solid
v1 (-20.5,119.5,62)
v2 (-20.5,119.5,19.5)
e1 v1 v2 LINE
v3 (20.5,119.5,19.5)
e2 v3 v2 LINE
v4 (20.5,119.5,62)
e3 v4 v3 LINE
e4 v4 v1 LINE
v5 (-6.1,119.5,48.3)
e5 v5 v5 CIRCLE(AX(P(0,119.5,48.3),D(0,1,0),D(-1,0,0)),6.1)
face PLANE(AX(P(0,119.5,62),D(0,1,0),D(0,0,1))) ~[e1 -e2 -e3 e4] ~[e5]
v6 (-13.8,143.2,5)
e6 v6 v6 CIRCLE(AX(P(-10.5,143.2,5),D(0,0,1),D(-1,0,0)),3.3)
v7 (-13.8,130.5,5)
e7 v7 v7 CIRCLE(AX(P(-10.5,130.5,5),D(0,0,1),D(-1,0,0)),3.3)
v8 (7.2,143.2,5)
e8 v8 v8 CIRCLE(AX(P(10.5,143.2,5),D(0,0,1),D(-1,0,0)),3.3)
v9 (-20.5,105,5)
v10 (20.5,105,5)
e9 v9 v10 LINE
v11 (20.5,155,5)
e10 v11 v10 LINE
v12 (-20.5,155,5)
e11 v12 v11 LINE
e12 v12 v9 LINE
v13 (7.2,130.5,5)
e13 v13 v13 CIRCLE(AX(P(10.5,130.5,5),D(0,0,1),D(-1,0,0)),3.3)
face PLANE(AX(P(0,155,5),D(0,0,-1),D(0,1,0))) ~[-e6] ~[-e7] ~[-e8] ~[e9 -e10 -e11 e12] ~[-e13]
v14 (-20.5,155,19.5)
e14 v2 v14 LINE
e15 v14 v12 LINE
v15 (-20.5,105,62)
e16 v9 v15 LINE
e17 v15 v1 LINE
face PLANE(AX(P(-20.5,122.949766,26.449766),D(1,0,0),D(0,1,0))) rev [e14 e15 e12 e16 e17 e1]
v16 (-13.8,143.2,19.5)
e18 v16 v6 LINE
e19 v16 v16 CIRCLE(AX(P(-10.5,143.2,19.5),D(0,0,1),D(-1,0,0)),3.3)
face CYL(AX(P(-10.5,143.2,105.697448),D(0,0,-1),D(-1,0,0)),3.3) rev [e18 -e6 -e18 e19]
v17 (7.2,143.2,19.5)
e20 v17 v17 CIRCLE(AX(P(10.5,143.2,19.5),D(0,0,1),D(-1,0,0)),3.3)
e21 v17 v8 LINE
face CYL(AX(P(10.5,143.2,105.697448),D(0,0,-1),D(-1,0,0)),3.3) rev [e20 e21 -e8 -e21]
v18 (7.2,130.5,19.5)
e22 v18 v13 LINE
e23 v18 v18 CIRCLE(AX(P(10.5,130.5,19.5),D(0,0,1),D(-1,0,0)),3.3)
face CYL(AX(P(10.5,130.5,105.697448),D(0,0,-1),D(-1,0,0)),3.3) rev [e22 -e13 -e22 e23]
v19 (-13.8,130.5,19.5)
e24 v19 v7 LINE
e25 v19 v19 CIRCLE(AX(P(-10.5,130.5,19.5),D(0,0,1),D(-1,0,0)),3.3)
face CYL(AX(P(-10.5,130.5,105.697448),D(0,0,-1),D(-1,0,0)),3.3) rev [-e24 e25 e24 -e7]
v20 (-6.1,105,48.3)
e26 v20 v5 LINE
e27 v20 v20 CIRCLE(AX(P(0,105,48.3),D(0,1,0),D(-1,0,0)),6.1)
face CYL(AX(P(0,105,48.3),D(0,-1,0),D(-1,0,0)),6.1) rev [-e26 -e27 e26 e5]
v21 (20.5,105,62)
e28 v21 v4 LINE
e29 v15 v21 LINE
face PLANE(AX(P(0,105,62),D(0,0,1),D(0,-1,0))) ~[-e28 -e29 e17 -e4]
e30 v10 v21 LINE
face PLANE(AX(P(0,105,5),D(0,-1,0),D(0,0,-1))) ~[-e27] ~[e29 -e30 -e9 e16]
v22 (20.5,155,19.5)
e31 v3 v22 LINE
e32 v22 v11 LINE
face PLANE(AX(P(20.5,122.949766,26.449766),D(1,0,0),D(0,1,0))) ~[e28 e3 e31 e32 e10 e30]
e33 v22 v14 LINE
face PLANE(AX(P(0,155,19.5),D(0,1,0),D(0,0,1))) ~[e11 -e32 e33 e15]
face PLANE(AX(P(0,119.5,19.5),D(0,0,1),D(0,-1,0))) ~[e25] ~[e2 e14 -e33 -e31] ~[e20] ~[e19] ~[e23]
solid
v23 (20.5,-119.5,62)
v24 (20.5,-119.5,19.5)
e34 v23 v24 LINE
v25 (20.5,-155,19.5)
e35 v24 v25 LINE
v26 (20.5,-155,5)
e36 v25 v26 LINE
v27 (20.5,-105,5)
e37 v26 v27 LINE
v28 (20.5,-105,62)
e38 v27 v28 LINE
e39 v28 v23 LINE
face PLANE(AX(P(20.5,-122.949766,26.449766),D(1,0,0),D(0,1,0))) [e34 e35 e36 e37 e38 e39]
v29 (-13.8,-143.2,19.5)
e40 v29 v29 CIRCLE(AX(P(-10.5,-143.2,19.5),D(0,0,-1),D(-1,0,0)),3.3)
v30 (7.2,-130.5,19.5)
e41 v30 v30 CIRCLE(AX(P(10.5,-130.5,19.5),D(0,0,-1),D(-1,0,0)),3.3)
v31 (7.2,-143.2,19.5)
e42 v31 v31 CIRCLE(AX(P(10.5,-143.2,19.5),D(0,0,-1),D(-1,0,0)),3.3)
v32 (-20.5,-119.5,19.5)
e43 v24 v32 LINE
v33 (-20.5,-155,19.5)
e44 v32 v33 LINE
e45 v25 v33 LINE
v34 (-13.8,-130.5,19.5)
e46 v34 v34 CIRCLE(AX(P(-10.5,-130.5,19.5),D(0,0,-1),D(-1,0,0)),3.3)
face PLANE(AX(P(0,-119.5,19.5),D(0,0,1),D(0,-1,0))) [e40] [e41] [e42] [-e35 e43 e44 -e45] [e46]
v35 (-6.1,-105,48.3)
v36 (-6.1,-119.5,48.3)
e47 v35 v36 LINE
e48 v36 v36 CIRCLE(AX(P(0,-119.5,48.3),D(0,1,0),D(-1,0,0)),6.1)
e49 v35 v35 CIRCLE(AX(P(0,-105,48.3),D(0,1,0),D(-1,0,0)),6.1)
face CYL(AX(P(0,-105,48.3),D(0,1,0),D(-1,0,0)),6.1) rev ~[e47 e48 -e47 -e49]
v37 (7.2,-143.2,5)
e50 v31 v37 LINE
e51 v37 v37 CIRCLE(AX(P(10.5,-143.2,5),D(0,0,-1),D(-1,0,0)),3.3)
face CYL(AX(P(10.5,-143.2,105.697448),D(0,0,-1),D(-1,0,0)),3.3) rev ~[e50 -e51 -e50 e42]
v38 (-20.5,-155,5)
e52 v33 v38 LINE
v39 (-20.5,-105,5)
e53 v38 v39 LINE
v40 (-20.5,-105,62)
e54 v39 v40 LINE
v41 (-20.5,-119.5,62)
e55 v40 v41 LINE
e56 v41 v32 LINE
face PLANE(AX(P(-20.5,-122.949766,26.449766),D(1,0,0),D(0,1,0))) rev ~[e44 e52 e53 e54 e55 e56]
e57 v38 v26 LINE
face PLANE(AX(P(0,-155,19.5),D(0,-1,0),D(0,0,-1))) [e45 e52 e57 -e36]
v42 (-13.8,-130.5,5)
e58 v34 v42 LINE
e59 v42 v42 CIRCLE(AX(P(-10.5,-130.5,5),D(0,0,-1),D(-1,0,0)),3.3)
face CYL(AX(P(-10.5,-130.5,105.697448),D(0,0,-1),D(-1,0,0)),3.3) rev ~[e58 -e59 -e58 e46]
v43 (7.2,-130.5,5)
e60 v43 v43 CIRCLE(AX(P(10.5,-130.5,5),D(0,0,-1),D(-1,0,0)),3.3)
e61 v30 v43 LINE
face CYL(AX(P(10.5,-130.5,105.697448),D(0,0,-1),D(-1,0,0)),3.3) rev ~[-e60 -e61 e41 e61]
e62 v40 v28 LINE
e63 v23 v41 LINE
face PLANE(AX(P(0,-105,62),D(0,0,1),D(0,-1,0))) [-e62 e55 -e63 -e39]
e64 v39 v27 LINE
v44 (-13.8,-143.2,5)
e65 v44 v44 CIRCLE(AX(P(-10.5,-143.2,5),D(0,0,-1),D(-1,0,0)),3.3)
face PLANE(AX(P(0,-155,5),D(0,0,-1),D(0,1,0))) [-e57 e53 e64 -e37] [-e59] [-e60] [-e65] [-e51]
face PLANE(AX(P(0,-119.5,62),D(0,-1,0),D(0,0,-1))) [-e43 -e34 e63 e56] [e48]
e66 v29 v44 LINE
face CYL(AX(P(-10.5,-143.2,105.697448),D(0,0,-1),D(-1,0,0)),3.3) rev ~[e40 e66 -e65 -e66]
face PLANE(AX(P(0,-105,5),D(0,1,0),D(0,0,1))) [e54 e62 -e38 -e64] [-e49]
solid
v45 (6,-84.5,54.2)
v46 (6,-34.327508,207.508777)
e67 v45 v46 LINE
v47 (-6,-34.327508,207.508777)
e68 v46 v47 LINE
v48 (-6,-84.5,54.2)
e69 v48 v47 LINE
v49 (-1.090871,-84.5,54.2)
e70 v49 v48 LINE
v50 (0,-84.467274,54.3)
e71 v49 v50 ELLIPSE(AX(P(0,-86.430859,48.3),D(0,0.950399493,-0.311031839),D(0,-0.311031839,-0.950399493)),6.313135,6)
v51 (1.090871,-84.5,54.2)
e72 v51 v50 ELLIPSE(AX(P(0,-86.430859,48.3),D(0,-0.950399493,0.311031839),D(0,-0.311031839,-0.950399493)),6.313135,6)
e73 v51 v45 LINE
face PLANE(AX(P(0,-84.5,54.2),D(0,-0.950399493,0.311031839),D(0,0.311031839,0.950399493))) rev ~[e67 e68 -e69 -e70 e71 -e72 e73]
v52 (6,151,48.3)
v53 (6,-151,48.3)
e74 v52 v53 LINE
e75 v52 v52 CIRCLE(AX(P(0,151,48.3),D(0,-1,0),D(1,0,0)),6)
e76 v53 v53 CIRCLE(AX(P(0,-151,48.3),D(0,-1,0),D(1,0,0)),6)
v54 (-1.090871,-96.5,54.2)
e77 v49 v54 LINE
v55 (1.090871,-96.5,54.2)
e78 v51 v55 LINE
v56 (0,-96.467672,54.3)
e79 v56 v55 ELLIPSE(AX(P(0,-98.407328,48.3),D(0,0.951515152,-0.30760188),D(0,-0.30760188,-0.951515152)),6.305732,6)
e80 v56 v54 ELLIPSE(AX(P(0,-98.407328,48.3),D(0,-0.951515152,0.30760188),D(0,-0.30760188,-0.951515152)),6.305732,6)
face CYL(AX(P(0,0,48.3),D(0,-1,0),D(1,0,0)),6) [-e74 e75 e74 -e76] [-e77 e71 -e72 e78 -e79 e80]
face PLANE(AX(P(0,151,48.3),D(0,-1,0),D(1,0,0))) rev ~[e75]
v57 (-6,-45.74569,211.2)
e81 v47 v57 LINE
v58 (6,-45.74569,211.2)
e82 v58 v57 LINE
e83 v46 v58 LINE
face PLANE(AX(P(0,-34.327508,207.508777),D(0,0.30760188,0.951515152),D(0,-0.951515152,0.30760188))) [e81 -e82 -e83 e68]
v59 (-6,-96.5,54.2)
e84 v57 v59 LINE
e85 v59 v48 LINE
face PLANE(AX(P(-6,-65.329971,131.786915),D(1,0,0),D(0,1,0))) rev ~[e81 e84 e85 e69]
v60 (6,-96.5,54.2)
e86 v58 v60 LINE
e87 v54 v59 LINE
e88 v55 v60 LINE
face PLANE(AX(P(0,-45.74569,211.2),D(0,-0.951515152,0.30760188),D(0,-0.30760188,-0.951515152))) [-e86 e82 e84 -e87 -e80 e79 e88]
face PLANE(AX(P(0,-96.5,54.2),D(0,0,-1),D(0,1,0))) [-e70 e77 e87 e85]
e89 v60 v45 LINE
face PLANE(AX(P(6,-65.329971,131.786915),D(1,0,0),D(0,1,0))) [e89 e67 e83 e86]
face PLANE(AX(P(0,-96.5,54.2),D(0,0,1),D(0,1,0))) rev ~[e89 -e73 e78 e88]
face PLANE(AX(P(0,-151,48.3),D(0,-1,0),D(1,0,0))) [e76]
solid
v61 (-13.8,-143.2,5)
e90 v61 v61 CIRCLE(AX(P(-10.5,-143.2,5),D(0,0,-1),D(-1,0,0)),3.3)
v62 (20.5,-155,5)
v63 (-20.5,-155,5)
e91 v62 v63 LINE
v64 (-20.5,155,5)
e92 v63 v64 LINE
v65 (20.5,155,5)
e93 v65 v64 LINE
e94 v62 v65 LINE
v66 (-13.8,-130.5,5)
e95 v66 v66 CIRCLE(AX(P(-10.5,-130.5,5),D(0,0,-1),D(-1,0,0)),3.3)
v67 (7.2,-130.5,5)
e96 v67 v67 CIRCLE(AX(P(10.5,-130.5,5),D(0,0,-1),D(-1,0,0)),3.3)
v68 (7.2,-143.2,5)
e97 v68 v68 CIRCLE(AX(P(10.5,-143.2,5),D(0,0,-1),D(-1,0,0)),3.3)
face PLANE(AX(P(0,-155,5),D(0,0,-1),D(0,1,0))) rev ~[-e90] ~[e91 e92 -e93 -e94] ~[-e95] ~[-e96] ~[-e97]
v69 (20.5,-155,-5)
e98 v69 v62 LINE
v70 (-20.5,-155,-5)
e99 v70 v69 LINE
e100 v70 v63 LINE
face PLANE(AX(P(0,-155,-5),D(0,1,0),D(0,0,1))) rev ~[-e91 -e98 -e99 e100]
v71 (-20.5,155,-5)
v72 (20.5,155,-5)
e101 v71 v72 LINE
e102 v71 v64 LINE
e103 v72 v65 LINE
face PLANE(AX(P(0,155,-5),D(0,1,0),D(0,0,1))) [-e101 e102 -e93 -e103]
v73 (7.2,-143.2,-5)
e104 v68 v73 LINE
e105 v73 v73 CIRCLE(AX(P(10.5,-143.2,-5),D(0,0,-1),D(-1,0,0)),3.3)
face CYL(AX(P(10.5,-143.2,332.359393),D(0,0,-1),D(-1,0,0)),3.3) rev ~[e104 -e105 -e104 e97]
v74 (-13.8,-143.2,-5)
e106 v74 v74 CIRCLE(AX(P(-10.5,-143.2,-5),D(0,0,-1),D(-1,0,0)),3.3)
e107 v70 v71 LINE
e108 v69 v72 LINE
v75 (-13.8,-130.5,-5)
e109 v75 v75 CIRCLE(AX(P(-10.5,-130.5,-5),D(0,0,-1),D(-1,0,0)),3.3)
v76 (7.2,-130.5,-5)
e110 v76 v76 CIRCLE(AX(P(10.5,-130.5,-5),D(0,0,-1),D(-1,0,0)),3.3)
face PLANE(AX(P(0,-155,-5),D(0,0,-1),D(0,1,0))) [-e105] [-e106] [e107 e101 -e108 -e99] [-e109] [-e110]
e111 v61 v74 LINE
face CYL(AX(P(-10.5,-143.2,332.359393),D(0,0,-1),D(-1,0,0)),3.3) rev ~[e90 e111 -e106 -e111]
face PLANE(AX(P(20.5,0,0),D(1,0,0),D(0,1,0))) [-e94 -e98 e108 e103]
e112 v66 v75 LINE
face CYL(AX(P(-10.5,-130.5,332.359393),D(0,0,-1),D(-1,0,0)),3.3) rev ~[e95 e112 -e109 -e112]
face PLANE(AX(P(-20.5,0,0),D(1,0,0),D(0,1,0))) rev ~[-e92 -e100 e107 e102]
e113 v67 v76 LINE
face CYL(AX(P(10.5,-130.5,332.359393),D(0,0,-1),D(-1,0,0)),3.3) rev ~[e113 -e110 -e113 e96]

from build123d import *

# Parameters (mm, degrees)
F0_W           = 310
F0_H           = 10
F1_DEPTH       = 20.5
F1_DEPTH_BACK  = 20.5
F3_DEPTH       = 20.5
F3_DEPTH_BACK  = 20.5
F5_D           = 6.6
F5_2_D         = 6.6
F6_R           = 6.1
F7_DEPTH       = 25
F9_R           = 6
F10_DEPTH      = 151
F10_DEPTH_BACK = 151
F12_DEPTH      = 6
F12_DEPTH_BACK = 6


# Not quite as in the source:
# - a feature of the source that left no trace in its solid (it failed there, or was rolled back) is left out


with BuildPart() as f1:
    # F0 (on Right) → F1 (new body, two sides)
    with BuildSketch(Plane.YZ) as f1_sk:
        Rectangle(F0_W, F0_H)
    extrude(amount=F1_DEPTH)
    extrude(f1_sk.sketch, amount=-F1_DEPTH_BACK)

    # F5 (through all)
    with Locations(Plane.XY.offset(19.5)):
        with Locations((10.5, -143.2), (-10.5, -143.2), (-10.5, -130.5), (10.5, -130.5)):
            Hole(F5_D / 2)


with BuildPart() as f3:
    # F2 (on Right) → F3 (new body, two sides)
    with BuildSketch(Plane.YZ) as f3_sk:
        Polygon((-155, 19.5), (-155, 5), (-105, 5), (-105, 62), (-119.5, 62), (-119.5, 19.5), align=None)
    extrude(amount=F3_DEPTH)
    extrude(f3_sk.sketch, amount=-F3_DEPTH_BACK)

    # F5#2 (through all)
    with Locations(Plane.XY.offset(19.5)):
        with Locations((10.5, -143.2), (-10.5, -143.2), (-10.5, -130.5), (10.5, -130.5)):
            Hole(F5_2_D / 2)

    # F6 (on face) → F7 (cut)
    with BuildSketch(Plane(origin=(0, -105, 0), x_dir=(-1, 0, 0), z_dir=(0, 1, 0))):
        with Locations((0, 48.3)):
            Circle(F6_R)
    extrude(amount=-F7_DEPTH, mode=Mode.SUBTRACT)


with BuildPart() as f8_1:
    # F8: instance of F3
    add(f3.part.mirror(Plane.XZ))


with BuildPart() as f10:
    # F9 (on Front) → F10 (new body, two sides)
    with BuildSketch(Plane.XZ) as f10_sk:
        with Locations((0, 48.3)):
            Circle(F9_R)
    extrude(amount=F10_DEPTH)
    extrude(f10_sk.sketch, amount=-F10_DEPTH_BACK)

    # F11 (on Right) → F12 (join, two sides)
    with BuildSketch(Plane.YZ) as f12_sk:
        Polygon((-45.7456898382, 211.2), (-96.5, 54.2), (-84.5, 54.2), (-34.32750802, 207.5087774428), align=None)
    extrude(amount=F12_DEPTH)
    extrude(f12_sk.sketch, amount=-F12_DEPTH_BACK)


solid = Compound([f1.part, f3.part, f8_1.part, f10.part])
